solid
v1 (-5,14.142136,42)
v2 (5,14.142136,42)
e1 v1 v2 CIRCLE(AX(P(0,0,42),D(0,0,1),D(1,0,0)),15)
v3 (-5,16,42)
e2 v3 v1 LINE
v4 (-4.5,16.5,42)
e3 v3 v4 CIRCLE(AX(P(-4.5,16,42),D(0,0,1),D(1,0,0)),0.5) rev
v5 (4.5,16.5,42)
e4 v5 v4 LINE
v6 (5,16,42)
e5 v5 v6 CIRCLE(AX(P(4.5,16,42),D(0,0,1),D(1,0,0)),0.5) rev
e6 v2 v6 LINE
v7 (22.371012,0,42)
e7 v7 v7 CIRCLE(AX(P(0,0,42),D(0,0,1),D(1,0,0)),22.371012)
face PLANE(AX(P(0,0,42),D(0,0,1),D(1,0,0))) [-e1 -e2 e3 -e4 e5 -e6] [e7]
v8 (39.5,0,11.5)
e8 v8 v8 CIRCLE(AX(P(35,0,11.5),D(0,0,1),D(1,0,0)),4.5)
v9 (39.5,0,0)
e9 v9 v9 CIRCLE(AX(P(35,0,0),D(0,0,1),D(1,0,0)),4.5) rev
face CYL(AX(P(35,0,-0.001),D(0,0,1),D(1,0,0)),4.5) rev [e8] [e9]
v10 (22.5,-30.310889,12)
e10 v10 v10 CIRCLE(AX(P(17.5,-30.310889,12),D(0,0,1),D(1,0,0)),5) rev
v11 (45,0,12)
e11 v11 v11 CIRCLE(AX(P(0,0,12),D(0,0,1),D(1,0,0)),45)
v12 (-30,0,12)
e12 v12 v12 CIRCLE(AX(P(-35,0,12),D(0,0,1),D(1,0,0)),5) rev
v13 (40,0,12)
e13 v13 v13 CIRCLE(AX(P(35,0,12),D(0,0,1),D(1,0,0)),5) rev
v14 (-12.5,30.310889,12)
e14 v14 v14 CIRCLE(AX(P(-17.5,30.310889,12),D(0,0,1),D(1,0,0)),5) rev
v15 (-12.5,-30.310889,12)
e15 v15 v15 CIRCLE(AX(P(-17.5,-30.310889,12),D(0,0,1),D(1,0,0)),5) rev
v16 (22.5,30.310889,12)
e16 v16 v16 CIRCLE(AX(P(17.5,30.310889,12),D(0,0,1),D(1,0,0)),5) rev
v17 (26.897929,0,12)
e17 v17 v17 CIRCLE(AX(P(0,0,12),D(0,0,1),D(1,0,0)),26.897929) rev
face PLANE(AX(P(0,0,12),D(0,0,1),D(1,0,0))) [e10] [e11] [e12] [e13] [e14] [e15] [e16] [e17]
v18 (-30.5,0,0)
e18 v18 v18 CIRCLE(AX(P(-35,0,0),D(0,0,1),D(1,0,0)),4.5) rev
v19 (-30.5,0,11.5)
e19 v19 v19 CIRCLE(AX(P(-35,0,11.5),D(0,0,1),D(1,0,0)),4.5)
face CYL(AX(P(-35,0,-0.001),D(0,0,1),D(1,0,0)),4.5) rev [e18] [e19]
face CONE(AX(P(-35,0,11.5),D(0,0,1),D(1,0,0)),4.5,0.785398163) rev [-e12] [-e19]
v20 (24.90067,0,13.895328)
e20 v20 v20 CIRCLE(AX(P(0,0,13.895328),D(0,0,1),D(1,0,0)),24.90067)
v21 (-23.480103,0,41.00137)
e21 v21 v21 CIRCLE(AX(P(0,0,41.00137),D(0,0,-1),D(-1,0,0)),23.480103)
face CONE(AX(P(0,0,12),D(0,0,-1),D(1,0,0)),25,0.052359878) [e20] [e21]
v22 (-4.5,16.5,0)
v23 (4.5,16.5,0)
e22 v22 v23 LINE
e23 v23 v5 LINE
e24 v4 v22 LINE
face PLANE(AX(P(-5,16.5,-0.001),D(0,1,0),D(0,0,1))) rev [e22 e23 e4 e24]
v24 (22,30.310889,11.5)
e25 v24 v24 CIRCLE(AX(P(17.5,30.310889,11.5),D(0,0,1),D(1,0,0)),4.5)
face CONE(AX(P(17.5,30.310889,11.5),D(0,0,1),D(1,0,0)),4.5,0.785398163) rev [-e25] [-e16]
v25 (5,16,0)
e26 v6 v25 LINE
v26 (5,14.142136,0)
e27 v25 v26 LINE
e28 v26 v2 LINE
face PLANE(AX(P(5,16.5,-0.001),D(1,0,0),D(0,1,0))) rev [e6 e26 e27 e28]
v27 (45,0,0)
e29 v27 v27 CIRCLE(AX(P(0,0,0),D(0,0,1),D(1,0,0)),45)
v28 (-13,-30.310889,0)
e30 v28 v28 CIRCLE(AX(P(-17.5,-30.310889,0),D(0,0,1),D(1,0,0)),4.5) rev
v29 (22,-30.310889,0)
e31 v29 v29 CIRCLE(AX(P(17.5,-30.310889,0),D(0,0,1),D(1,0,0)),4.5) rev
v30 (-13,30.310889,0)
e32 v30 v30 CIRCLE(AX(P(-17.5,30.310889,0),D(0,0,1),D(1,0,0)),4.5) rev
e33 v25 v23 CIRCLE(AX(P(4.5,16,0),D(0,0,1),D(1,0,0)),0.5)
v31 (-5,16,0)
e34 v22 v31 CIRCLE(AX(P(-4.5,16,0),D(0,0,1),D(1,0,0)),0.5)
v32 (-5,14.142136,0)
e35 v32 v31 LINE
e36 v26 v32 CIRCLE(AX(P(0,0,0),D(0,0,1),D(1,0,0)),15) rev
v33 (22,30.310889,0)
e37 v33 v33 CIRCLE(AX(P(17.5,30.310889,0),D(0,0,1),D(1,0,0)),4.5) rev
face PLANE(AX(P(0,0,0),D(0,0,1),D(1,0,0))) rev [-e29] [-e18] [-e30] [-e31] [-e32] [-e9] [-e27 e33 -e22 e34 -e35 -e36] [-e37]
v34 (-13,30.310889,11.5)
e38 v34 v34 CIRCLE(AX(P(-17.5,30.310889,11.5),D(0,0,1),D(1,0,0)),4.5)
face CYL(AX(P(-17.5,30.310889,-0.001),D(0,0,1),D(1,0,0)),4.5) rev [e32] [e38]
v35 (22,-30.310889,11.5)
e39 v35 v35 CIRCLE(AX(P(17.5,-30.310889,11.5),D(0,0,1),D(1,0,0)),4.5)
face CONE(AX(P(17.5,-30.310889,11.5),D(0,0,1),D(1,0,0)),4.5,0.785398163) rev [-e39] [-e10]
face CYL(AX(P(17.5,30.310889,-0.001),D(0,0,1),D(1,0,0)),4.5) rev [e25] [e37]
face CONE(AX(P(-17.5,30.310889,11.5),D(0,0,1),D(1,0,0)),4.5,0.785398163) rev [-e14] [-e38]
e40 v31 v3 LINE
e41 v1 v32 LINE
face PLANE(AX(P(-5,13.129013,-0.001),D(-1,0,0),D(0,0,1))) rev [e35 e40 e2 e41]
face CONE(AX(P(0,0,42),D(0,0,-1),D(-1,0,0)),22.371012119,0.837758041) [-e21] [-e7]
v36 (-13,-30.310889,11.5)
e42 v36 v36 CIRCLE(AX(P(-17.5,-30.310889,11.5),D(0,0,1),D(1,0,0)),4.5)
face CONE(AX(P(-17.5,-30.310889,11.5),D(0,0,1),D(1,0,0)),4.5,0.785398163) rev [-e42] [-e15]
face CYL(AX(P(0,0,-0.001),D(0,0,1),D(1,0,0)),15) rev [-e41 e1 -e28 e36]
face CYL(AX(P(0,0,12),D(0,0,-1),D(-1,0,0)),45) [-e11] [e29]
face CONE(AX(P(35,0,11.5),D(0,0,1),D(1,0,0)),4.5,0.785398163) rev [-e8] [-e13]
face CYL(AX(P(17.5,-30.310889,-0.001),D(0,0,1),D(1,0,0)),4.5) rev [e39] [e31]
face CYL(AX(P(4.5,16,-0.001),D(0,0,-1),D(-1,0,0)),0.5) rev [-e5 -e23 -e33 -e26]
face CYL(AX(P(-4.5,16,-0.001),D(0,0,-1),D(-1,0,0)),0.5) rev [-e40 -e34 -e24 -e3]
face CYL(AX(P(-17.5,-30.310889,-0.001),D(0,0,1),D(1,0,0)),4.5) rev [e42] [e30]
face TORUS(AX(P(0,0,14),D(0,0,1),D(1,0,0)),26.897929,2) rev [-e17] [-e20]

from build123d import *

# Parameters (mm, degrees)
SKICA1_R                      = 45
P_IDAT_VYSUNUT_M1_DEPTH       = 12
SKICA2_R                      = 25
P_IDAT_VYSUNUT_M2_DEPTH       = 30
P_IDAT_VYSUNUT_M2_TAPER       = 3
ODEBRAT_VYSUNUT_M1_REACH      = 78.25
SKICA3_R                      = 15
ODEBRAT_VYSUNUT_M2_REACH      = 78.25
SKICA4_W                      = 10
SKICA4_H                      = 3.370987204
ZAOBLIT1_R                    = 2
ODEBRAT_VYSUNUT_M3_REACH      = 72.356
SKICA5_R                      = 4.5
ZKOSEN_1_SIZE                 = 0.5
KRUHOV_POLE1_COUNT            = 6
ZKOSEN_1_OF_KRUHOV_POLE1_SIZE = 0.5
ZAOBLIT2_R                    = 0.5
ZKOSEN_2_SIZE                 = 1.056754503
ZKOSEN_2_SIZE_2               = 1


with BuildPart() as part:
    # Skica1 → Přidat vysunutím1 (new body)
    with BuildSketch(Plane.XY):
        Circle(SKICA1_R)
    extrude(amount=P_IDAT_VYSUNUT_M1_DEPTH)

    # Skica2 → Přidat vysunutím2 (add)
    with BuildSketch(Plane.XY.offset(12)):
        Circle(SKICA2_R)
    extrude(amount=P_IDAT_VYSUNUT_M2_DEPTH, taper=P_IDAT_VYSUNUT_M2_TAPER)

    # Skica3 → Odebrat vysunutím1 (cut, up to next)
    with BuildSketch(Plane.XY.offset(42), mode=Mode.PRIVATE) as odebrat_vysunut_m1_sk1:
        Circle(SKICA3_R)
    odebrat_vysunut_m1_tool1 = extrude(odebrat_vysunut_m1_sk1.sketch, amount=-ODEBRAT_VYSUNUT_M1_REACH, mode=Mode.PRIVATE) & part.part
    add(odebrat_vysunut_m1_tool1.solids().sort_by_distance((0, 0, 42))[0], mode=Mode.SUBTRACT)

    # Skica4 → Odebrat vysunutím2 (cut, up to next)
    with BuildSketch(Plane.XY.offset(42), mode=Mode.PRIVATE) as odebrat_vysunut_m2_sk1:
        with Locations((0, 14.814506398)):
            Rectangle(SKICA4_W, SKICA4_H)
    odebrat_vysunut_m2_tool1 = extrude(odebrat_vysunut_m2_sk1.sketch, amount=-ODEBRAT_VYSUNUT_M2_REACH, mode=Mode.PRIVATE) & part.part
    add(odebrat_vysunut_m2_tool1.solids().sort_by_distance((0, 14.814506, 42))[0], mode=Mode.SUBTRACT)

    # Zaoblit1
    zaoblit1_edges = [part.edges().sort_by_distance(p)[0] for p in [
        (-25, 0, 12),
    ]]
    fillet(zaoblit1_edges, radius=ZAOBLIT1_R)

    # Skica5 → Odebrat vysunutím3 (cut, up to next)
    with BuildSketch(Plane.XY.offset(12), mode=Mode.PRIVATE) as odebrat_vysunut_m3_sk1:
        with Locations((35, 0)):
            Circle(SKICA5_R)
    odebrat_vysunut_m3_tool1 = extrude(odebrat_vysunut_m3_sk1.sketch, amount=-ODEBRAT_VYSUNUT_M3_REACH, mode=Mode.PRIVATE) & part.part
    odebrat_vysunut_m3 = odebrat_vysunut_m3_tool1.solids().sort_by_distance((35, 0, 12))[0]
    add(odebrat_vysunut_m3, mode=Mode.SUBTRACT)

    # Zkosení1
    zkosen_1_edges = [part.edges().sort_by_distance(p)[0] for p in [
        (30.5, 0, 12),
    ]]
    chamfer(zkosen_1_edges, length=ZKOSEN_1_SIZE)

    # Kruhové pole1: Odebrat vysunutím3 ×6 about axis
    kruhov_pole1_axis = Axis((0, 0, 0), (0, 0, 1))
    for i in range(1, KRUHOV_POLE1_COUNT):
        add(odebrat_vysunut_m3.rotate(kruhov_pole1_axis, i * 360 / KRUHOV_POLE1_COUNT), mode=Mode.SUBTRACT)

    # Zkosení1 of Kruhové pole1
    zkosen_1_of_kruhov_pole1_edges = [part.edges().sort_by_distance(p)[0] for p in [
        (15.25, 26.413774815, 12),
        (-15.25, 26.413774815, 12),
        (-30.5, 0, 12),
        (-15.25, -26.413774815, 12),
        (15.25, -26.413774815, 12),
    ]]
    chamfer(zkosen_1_of_kruhov_pole1_edges, length=ZKOSEN_1_OF_KRUHOV_POLE1_SIZE)

    # Zaoblit2
    zaoblit2_edges = [part.edges().sort_by_distance(p)[0] for p in [
        (-5, 16.5, 21),
        (5, 16.5, 21),
    ]]
    fillet(zaoblit2_edges, radius=ZAOBLIT2_R)

    # Zkosení2
    # the kernel refuses this chamfer: 1.056754503, 1 mm, written as the material it takes off along each edge
    with BuildSketch(Plane(origin=(0, 0, 42), x_dir=(1, 0, 0), z_dir=(0, 1, 0))) as zkosen_2_piece_1:
        Polygon((23.427766622 - ZKOSEN_2_SIZE, 0), (23.427766622 + ZKOSEN_2_SIZE_2 * 0.0523359562429, ZKOSEN_2_SIZE_2 * 0.998629534755), (23.427766622, 0), align=None)
    revolve(axis=Axis((0, 0, 42), (0, 0, -1)), mode=Mode.SUBTRACT)


solid = part.part
